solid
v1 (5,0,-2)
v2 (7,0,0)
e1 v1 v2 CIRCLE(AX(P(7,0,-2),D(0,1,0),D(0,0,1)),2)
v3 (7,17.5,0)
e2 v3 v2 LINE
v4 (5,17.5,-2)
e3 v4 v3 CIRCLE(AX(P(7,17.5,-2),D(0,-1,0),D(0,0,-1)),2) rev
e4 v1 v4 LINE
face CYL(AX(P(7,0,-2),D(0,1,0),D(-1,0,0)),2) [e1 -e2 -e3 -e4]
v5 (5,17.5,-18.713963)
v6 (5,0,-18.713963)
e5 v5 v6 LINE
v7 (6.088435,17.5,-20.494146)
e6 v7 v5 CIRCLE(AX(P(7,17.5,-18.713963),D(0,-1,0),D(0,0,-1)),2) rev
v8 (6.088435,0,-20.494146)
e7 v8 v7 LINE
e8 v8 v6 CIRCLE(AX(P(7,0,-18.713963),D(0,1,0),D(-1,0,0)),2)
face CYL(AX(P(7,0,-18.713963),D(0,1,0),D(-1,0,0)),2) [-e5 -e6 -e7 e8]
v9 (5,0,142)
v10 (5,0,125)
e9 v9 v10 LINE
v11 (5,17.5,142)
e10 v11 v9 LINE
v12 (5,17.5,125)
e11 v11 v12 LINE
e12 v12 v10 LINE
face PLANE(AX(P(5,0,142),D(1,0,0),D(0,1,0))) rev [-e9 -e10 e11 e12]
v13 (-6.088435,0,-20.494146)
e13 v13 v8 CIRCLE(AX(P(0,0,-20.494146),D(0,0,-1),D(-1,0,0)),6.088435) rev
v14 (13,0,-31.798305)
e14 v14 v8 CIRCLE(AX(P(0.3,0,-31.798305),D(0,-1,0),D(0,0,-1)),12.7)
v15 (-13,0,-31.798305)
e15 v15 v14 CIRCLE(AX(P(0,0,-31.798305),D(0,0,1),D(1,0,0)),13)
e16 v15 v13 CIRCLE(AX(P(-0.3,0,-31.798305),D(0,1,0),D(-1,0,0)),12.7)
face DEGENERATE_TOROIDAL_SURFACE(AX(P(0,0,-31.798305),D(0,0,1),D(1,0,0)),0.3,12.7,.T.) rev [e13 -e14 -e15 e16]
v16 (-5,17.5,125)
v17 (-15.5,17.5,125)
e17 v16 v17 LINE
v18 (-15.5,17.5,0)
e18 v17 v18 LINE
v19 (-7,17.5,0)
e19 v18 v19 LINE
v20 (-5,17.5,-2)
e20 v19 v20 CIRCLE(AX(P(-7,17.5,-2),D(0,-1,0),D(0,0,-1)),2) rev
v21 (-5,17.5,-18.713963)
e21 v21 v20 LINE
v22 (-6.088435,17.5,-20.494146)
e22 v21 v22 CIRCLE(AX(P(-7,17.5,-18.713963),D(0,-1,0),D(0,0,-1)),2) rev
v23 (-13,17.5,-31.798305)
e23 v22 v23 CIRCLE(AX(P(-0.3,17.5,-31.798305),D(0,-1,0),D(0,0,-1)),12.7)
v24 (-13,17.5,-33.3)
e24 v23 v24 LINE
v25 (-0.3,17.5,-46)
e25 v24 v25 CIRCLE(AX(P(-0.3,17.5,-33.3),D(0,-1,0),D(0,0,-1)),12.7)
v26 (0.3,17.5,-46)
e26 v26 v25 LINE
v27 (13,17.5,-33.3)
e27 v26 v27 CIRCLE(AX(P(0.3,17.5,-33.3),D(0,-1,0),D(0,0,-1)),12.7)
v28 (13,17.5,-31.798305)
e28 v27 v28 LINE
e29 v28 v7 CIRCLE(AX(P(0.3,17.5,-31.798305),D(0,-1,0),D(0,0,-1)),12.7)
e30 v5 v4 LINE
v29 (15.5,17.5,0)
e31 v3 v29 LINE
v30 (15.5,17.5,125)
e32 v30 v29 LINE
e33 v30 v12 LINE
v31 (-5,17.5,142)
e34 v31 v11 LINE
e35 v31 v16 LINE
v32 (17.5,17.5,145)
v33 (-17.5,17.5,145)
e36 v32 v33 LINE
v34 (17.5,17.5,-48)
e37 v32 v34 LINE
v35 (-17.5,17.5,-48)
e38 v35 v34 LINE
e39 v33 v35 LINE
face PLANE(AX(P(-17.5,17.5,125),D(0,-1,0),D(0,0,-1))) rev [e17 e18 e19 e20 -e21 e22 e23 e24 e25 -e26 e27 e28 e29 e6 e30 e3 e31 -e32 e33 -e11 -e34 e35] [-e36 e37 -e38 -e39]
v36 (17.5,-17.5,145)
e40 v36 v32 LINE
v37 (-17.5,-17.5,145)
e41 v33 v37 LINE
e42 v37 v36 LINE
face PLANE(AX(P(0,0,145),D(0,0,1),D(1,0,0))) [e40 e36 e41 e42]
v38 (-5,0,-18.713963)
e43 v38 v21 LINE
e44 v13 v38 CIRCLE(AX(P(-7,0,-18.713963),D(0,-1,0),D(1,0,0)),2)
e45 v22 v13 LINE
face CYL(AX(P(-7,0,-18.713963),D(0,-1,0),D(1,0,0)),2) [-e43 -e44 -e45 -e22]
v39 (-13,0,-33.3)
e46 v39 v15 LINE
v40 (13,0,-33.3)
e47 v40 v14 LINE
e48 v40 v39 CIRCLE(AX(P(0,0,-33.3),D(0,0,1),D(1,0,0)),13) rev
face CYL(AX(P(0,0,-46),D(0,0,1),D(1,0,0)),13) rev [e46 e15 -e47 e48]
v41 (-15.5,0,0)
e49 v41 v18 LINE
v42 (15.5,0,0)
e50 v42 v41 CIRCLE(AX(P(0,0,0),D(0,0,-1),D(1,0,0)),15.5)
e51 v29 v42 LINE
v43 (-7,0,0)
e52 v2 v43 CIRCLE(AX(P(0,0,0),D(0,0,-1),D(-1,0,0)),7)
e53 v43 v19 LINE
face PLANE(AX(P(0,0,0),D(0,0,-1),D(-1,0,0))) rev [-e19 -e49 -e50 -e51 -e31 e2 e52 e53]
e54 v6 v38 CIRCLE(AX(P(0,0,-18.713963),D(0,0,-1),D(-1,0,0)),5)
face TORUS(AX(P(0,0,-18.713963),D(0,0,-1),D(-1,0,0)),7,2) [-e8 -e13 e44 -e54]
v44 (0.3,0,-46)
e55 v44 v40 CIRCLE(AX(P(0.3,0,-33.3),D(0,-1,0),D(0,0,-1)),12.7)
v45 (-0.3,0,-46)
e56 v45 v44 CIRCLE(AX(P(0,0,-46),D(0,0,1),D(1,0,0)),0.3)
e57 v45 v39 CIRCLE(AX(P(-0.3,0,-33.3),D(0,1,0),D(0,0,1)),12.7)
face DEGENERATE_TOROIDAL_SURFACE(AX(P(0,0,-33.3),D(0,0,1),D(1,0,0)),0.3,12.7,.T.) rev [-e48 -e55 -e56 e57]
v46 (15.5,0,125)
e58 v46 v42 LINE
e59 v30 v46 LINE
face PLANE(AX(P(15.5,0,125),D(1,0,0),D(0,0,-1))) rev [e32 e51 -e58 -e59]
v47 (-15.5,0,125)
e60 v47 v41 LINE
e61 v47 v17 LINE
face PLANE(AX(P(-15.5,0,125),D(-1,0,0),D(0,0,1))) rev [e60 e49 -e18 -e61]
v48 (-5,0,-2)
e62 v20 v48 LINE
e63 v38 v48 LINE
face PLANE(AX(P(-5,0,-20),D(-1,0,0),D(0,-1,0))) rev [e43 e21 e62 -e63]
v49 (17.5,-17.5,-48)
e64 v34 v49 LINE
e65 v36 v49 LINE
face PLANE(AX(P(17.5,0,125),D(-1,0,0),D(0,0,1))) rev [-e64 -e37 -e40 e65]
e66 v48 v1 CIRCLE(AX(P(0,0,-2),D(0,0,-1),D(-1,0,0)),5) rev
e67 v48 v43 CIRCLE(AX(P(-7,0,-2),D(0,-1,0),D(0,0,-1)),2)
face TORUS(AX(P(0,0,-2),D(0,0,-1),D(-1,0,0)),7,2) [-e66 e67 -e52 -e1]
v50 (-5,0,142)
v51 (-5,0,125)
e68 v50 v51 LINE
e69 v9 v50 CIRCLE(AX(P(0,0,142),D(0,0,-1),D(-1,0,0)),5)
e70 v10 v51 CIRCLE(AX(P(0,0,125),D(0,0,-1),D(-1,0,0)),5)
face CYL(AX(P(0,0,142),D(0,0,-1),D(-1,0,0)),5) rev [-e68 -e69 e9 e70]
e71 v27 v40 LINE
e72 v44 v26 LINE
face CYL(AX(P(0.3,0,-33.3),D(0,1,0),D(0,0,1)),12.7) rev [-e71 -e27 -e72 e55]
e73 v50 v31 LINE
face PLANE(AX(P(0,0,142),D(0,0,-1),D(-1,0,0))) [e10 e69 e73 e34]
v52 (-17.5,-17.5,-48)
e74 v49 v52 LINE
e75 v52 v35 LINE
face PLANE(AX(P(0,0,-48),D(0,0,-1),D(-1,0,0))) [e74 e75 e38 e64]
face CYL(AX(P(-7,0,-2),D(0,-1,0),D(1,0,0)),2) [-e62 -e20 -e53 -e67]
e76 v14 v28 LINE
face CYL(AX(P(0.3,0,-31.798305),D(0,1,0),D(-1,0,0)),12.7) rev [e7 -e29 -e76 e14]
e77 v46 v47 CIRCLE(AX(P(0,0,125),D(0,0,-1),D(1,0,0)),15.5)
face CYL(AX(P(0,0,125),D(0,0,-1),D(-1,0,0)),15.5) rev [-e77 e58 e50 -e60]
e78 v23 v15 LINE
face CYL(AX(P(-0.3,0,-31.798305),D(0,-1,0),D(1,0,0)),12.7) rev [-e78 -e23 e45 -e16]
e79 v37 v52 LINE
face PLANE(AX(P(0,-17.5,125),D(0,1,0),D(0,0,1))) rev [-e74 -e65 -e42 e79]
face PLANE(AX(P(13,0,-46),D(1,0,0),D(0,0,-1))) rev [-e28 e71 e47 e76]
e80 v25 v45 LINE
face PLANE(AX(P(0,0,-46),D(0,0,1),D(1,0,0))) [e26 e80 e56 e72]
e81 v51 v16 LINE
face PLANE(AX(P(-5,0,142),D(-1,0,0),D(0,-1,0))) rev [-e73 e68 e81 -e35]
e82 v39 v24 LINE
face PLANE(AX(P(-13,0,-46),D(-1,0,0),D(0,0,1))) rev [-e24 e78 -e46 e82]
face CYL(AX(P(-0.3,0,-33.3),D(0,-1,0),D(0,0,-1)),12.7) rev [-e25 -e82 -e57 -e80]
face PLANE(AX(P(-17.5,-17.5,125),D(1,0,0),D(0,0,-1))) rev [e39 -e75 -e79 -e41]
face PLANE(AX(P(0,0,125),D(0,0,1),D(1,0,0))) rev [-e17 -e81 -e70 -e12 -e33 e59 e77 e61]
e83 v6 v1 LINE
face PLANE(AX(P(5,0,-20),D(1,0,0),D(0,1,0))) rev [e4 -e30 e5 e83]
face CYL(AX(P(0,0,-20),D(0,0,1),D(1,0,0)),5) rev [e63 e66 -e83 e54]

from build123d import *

# Parameters (mm, degrees)
BOSS_EXTRUDE3_DEPTH = 125
SKETCH4_W           = 35
SKETCH4_H           = 35
BOSS_EXTRUDE4_DEPTH = 20
CUT_EXTRUDE2_DEPTH  = 17
SKETCH6_W           = 35
SKETCH6_H           = 35
BOSS_EXTRUDE5_DEPTH = 48
CUT_EXTRUDE3_START  = -20
CUT_EXTRUDE3_DEPTH  = 20
CUT_EXTRUDE4_DEPTH  = 26
FILLET1_R           = 12.7
FILLET2_R           = 2


with BuildPart() as part:
    # Sketch1 → Boss-Extrude3 (new body)
    with BuildSketch(Plane.XY):
        with BuildLine():
            Line((0, -17.5), (-17.5, -17.5))
            Line((-17.5, -17.5), (-17.5, 0))
            Line((-17.5, 0), (-17.5, 17.5))
            Line((-17.5, 17.5), (-15.5, 17.5))
            Line((-15.5, 17.5), (-15.5, 0))
            ThreePointArc((-15.5, 0), (0, -15.5), (15.5, 0))
            Line((15.5, 0), (15.5, 17.5))
            Line((15.5, 17.5), (17.5, 17.5))
            Line((17.5, 17.5), (17.5, 0))
            Line((17.5, 0), (17.5, -17.5))
            Line((17.5, -17.5), (0, -17.5))
        make_face()
    extrude(amount=BOSS_EXTRUDE3_DEPTH)

    # Sketch4 → Boss-Extrude4 (add)
    with BuildSketch(Plane.XY.offset(125)):
        Rectangle(SKETCH4_W, SKETCH4_H)
    extrude(amount=BOSS_EXTRUDE4_DEPTH)

    # Sketch5 → Cut-Extrude2 (cut)
    with BuildSketch(Plane(origin=(0, 0, 125), x_dir=(-1, 0, 0), z_dir=(0, 0, -1))):
        with BuildLine():
            Line((-5, 0), (-5, 17.5))
            Line((-5, 17.5), (5, 17.5))
            Line((5, 17.5), (5, 0))
            ThreePointArc((5, 0), (0, -5), (-5, 0))
        make_face()
    extrude(amount=-CUT_EXTRUDE2_DEPTH, mode=Mode.SUBTRACT)

    # Sketch6 → Boss-Extrude5 (add)
    with BuildSketch(Plane(origin=(0, 0, 0), x_dir=(-1, 0, 0), z_dir=(0, 0, -1))):
        Rectangle(SKETCH6_W, SKETCH6_H)
    extrude(amount=BOSS_EXTRUDE5_DEPTH)

    # Sketch7 → Cut-Extrude3 (cut)
    with BuildSketch(Plane.XY.offset(CUT_EXTRUDE3_START)):
        with BuildLine():
            Line((-5, 0), (-5, 17.5))
            Line((-5, 17.5), (5, 17.5))
            Line((5, 17.5), (5, 0))
            ThreePointArc((5, 0), (0, -5), (-5, 0))
        make_face()
    extrude(amount=CUT_EXTRUDE3_DEPTH, mode=Mode.SUBTRACT)

    # Sketch8 → Cut-Extrude4 (cut)
    with BuildSketch(Plane.XY.offset(-20)):
        with BuildLine():
            Line((-13, 0), (-13, 27.339362416))
            Line((-13, 27.339362416), (13, 27.339362416))
            Line((13, 27.339362416), (13, 0))
            ThreePointArc((13, 0), (0, -13), (-13, 0))
        make_face()
    extrude(amount=-CUT_EXTRUDE4_DEPTH, mode=Mode.SUBTRACT)

    # Fillet1
    # the kernel refuses this fillet: 12.7 mm, written as the material it adds along each edge
    with BuildSketch(Plane(origin=(13, 17.5, -20), x_dir=(-1, 0, 0), z_dir=(0, -1, 0)), Plane(origin=(-13, 0, -20), x_dir=(1, 0, 0), z_dir=(0, 1, 0))) as fillet1_piece_1:
        with BuildLine():
            CenterArc((12.7, 11.798304963), FILLET1_R, 180, 68.279526527)
            Line((0, 11.798304963), (-0.254, 11.798304963))
            Line((-0.254, 11.798304963), (-0.254, 0))
            Line((-0.254, 0), (0, -0.254))
            ThreePointArc((0, -0.254), (4, -0.254), (7.906, -0.235966099))
            Line((7.906, -0.235966099), (8, 0))
        make_face()
    extrude(amount=17.5)
    with BuildSketch(Plane(origin=(0, 0, -20), x_dir=(1, 0, 0), z_dir=(0, 1, 0))) as fillet1_piece_2:
        with BuildLine():
            CenterArc((0.3, 11.798304963), FILLET1_R, 291.720473473, 68.279526527)
            Line((13, 11.798304963), (13.254, 11.798304963))
            Line((13.254, 11.798304963), (13.254, 0))
            Line((13.254, 0), (13, -0.254))
            ThreePointArc((13, -0.254), (9, -0.254), (5.094, -0.235966099))
            Line((5.094, -0.235966099), (5, 0))
        make_face()
    revolve(axis=Axis((0, 0, -20), (0, 0, -1)), revolution_arc=180)
    with BuildSketch(Plane(origin=(13, 17.5, -46), x_dir=(0, 0, 1), z_dir=(0, -1, 0))) as fillet1_piece_3:
        with BuildLine():
            CenterArc((FILLET1_R, FILLET1_R), FILLET1_R, 180, 90)
            Line((0, FILLET1_R), (-FILLET1_R * 0.02, FILLET1_R))
            Line((-FILLET1_R * 0.02, FILLET1_R), (-FILLET1_R * 0.02, -FILLET1_R * 0.02))
            Line((-FILLET1_R * 0.02, -FILLET1_R * 0.02), (FILLET1_R, -FILLET1_R * 0.02))
            Line((FILLET1_R, -FILLET1_R * 0.02), (FILLET1_R, 0))
        make_face()
    extrude(amount=17.5)
    with BuildSketch(Plane(origin=(0, 0, -46), x_dir=(1, 0, 0), z_dir=(0, 1, 0))) as fillet1_piece_4:
        with BuildLine():
            CenterArc((13 - FILLET1_R, -FILLET1_R), FILLET1_R, 0, 90)
            Line((13, -FILLET1_R), (13 + FILLET1_R * 0.02, -FILLET1_R))
            Line((13 + FILLET1_R * 0.02, -FILLET1_R), (13 + FILLET1_R * 0.02, FILLET1_R * 0.02))
            Line((13 + FILLET1_R * 0.02, FILLET1_R * 0.02), (13 - FILLET1_R, FILLET1_R * 0.02))
            Line((13 - FILLET1_R, FILLET1_R * 0.02), (13 - FILLET1_R, 0))
        make_face()
    revolve(axis=Axis((0, 0, -46), (0, 0, -1)), revolution_arc=180)
    with BuildSketch(Plane(origin=(-13, 0, -46), x_dir=(1, 0, 0), z_dir=(0, 1, 0))) as fillet1_piece_5:
        with BuildLine():
            CenterArc((FILLET1_R, -FILLET1_R), FILLET1_R, 90, 90)
            Line((0, -FILLET1_R), (-FILLET1_R * 0.02, -FILLET1_R))
            Line((-FILLET1_R * 0.02, -FILLET1_R), (-FILLET1_R * 0.02, FILLET1_R * 0.02))
            Line((-FILLET1_R * 0.02, FILLET1_R * 0.02), (FILLET1_R, FILLET1_R * 0.02))
            Line((FILLET1_R, FILLET1_R * 0.02), (FILLET1_R, 0))
        make_face()
    extrude(amount=17.5)

    # Fillet2
    fillet2_edges = [part.edges().sort_by_distance(p)[0] for p in [
        (0, -5, -20),
        (-5, 8.75, -20),
        (5, 8.75, -20),
        (0, -5, 0),
        (5, 8.75, 0),
        (-5, 8.75, 0),
    ]]
    fillet(fillet2_edges, radius=FILLET2_R)


solid = part.part
